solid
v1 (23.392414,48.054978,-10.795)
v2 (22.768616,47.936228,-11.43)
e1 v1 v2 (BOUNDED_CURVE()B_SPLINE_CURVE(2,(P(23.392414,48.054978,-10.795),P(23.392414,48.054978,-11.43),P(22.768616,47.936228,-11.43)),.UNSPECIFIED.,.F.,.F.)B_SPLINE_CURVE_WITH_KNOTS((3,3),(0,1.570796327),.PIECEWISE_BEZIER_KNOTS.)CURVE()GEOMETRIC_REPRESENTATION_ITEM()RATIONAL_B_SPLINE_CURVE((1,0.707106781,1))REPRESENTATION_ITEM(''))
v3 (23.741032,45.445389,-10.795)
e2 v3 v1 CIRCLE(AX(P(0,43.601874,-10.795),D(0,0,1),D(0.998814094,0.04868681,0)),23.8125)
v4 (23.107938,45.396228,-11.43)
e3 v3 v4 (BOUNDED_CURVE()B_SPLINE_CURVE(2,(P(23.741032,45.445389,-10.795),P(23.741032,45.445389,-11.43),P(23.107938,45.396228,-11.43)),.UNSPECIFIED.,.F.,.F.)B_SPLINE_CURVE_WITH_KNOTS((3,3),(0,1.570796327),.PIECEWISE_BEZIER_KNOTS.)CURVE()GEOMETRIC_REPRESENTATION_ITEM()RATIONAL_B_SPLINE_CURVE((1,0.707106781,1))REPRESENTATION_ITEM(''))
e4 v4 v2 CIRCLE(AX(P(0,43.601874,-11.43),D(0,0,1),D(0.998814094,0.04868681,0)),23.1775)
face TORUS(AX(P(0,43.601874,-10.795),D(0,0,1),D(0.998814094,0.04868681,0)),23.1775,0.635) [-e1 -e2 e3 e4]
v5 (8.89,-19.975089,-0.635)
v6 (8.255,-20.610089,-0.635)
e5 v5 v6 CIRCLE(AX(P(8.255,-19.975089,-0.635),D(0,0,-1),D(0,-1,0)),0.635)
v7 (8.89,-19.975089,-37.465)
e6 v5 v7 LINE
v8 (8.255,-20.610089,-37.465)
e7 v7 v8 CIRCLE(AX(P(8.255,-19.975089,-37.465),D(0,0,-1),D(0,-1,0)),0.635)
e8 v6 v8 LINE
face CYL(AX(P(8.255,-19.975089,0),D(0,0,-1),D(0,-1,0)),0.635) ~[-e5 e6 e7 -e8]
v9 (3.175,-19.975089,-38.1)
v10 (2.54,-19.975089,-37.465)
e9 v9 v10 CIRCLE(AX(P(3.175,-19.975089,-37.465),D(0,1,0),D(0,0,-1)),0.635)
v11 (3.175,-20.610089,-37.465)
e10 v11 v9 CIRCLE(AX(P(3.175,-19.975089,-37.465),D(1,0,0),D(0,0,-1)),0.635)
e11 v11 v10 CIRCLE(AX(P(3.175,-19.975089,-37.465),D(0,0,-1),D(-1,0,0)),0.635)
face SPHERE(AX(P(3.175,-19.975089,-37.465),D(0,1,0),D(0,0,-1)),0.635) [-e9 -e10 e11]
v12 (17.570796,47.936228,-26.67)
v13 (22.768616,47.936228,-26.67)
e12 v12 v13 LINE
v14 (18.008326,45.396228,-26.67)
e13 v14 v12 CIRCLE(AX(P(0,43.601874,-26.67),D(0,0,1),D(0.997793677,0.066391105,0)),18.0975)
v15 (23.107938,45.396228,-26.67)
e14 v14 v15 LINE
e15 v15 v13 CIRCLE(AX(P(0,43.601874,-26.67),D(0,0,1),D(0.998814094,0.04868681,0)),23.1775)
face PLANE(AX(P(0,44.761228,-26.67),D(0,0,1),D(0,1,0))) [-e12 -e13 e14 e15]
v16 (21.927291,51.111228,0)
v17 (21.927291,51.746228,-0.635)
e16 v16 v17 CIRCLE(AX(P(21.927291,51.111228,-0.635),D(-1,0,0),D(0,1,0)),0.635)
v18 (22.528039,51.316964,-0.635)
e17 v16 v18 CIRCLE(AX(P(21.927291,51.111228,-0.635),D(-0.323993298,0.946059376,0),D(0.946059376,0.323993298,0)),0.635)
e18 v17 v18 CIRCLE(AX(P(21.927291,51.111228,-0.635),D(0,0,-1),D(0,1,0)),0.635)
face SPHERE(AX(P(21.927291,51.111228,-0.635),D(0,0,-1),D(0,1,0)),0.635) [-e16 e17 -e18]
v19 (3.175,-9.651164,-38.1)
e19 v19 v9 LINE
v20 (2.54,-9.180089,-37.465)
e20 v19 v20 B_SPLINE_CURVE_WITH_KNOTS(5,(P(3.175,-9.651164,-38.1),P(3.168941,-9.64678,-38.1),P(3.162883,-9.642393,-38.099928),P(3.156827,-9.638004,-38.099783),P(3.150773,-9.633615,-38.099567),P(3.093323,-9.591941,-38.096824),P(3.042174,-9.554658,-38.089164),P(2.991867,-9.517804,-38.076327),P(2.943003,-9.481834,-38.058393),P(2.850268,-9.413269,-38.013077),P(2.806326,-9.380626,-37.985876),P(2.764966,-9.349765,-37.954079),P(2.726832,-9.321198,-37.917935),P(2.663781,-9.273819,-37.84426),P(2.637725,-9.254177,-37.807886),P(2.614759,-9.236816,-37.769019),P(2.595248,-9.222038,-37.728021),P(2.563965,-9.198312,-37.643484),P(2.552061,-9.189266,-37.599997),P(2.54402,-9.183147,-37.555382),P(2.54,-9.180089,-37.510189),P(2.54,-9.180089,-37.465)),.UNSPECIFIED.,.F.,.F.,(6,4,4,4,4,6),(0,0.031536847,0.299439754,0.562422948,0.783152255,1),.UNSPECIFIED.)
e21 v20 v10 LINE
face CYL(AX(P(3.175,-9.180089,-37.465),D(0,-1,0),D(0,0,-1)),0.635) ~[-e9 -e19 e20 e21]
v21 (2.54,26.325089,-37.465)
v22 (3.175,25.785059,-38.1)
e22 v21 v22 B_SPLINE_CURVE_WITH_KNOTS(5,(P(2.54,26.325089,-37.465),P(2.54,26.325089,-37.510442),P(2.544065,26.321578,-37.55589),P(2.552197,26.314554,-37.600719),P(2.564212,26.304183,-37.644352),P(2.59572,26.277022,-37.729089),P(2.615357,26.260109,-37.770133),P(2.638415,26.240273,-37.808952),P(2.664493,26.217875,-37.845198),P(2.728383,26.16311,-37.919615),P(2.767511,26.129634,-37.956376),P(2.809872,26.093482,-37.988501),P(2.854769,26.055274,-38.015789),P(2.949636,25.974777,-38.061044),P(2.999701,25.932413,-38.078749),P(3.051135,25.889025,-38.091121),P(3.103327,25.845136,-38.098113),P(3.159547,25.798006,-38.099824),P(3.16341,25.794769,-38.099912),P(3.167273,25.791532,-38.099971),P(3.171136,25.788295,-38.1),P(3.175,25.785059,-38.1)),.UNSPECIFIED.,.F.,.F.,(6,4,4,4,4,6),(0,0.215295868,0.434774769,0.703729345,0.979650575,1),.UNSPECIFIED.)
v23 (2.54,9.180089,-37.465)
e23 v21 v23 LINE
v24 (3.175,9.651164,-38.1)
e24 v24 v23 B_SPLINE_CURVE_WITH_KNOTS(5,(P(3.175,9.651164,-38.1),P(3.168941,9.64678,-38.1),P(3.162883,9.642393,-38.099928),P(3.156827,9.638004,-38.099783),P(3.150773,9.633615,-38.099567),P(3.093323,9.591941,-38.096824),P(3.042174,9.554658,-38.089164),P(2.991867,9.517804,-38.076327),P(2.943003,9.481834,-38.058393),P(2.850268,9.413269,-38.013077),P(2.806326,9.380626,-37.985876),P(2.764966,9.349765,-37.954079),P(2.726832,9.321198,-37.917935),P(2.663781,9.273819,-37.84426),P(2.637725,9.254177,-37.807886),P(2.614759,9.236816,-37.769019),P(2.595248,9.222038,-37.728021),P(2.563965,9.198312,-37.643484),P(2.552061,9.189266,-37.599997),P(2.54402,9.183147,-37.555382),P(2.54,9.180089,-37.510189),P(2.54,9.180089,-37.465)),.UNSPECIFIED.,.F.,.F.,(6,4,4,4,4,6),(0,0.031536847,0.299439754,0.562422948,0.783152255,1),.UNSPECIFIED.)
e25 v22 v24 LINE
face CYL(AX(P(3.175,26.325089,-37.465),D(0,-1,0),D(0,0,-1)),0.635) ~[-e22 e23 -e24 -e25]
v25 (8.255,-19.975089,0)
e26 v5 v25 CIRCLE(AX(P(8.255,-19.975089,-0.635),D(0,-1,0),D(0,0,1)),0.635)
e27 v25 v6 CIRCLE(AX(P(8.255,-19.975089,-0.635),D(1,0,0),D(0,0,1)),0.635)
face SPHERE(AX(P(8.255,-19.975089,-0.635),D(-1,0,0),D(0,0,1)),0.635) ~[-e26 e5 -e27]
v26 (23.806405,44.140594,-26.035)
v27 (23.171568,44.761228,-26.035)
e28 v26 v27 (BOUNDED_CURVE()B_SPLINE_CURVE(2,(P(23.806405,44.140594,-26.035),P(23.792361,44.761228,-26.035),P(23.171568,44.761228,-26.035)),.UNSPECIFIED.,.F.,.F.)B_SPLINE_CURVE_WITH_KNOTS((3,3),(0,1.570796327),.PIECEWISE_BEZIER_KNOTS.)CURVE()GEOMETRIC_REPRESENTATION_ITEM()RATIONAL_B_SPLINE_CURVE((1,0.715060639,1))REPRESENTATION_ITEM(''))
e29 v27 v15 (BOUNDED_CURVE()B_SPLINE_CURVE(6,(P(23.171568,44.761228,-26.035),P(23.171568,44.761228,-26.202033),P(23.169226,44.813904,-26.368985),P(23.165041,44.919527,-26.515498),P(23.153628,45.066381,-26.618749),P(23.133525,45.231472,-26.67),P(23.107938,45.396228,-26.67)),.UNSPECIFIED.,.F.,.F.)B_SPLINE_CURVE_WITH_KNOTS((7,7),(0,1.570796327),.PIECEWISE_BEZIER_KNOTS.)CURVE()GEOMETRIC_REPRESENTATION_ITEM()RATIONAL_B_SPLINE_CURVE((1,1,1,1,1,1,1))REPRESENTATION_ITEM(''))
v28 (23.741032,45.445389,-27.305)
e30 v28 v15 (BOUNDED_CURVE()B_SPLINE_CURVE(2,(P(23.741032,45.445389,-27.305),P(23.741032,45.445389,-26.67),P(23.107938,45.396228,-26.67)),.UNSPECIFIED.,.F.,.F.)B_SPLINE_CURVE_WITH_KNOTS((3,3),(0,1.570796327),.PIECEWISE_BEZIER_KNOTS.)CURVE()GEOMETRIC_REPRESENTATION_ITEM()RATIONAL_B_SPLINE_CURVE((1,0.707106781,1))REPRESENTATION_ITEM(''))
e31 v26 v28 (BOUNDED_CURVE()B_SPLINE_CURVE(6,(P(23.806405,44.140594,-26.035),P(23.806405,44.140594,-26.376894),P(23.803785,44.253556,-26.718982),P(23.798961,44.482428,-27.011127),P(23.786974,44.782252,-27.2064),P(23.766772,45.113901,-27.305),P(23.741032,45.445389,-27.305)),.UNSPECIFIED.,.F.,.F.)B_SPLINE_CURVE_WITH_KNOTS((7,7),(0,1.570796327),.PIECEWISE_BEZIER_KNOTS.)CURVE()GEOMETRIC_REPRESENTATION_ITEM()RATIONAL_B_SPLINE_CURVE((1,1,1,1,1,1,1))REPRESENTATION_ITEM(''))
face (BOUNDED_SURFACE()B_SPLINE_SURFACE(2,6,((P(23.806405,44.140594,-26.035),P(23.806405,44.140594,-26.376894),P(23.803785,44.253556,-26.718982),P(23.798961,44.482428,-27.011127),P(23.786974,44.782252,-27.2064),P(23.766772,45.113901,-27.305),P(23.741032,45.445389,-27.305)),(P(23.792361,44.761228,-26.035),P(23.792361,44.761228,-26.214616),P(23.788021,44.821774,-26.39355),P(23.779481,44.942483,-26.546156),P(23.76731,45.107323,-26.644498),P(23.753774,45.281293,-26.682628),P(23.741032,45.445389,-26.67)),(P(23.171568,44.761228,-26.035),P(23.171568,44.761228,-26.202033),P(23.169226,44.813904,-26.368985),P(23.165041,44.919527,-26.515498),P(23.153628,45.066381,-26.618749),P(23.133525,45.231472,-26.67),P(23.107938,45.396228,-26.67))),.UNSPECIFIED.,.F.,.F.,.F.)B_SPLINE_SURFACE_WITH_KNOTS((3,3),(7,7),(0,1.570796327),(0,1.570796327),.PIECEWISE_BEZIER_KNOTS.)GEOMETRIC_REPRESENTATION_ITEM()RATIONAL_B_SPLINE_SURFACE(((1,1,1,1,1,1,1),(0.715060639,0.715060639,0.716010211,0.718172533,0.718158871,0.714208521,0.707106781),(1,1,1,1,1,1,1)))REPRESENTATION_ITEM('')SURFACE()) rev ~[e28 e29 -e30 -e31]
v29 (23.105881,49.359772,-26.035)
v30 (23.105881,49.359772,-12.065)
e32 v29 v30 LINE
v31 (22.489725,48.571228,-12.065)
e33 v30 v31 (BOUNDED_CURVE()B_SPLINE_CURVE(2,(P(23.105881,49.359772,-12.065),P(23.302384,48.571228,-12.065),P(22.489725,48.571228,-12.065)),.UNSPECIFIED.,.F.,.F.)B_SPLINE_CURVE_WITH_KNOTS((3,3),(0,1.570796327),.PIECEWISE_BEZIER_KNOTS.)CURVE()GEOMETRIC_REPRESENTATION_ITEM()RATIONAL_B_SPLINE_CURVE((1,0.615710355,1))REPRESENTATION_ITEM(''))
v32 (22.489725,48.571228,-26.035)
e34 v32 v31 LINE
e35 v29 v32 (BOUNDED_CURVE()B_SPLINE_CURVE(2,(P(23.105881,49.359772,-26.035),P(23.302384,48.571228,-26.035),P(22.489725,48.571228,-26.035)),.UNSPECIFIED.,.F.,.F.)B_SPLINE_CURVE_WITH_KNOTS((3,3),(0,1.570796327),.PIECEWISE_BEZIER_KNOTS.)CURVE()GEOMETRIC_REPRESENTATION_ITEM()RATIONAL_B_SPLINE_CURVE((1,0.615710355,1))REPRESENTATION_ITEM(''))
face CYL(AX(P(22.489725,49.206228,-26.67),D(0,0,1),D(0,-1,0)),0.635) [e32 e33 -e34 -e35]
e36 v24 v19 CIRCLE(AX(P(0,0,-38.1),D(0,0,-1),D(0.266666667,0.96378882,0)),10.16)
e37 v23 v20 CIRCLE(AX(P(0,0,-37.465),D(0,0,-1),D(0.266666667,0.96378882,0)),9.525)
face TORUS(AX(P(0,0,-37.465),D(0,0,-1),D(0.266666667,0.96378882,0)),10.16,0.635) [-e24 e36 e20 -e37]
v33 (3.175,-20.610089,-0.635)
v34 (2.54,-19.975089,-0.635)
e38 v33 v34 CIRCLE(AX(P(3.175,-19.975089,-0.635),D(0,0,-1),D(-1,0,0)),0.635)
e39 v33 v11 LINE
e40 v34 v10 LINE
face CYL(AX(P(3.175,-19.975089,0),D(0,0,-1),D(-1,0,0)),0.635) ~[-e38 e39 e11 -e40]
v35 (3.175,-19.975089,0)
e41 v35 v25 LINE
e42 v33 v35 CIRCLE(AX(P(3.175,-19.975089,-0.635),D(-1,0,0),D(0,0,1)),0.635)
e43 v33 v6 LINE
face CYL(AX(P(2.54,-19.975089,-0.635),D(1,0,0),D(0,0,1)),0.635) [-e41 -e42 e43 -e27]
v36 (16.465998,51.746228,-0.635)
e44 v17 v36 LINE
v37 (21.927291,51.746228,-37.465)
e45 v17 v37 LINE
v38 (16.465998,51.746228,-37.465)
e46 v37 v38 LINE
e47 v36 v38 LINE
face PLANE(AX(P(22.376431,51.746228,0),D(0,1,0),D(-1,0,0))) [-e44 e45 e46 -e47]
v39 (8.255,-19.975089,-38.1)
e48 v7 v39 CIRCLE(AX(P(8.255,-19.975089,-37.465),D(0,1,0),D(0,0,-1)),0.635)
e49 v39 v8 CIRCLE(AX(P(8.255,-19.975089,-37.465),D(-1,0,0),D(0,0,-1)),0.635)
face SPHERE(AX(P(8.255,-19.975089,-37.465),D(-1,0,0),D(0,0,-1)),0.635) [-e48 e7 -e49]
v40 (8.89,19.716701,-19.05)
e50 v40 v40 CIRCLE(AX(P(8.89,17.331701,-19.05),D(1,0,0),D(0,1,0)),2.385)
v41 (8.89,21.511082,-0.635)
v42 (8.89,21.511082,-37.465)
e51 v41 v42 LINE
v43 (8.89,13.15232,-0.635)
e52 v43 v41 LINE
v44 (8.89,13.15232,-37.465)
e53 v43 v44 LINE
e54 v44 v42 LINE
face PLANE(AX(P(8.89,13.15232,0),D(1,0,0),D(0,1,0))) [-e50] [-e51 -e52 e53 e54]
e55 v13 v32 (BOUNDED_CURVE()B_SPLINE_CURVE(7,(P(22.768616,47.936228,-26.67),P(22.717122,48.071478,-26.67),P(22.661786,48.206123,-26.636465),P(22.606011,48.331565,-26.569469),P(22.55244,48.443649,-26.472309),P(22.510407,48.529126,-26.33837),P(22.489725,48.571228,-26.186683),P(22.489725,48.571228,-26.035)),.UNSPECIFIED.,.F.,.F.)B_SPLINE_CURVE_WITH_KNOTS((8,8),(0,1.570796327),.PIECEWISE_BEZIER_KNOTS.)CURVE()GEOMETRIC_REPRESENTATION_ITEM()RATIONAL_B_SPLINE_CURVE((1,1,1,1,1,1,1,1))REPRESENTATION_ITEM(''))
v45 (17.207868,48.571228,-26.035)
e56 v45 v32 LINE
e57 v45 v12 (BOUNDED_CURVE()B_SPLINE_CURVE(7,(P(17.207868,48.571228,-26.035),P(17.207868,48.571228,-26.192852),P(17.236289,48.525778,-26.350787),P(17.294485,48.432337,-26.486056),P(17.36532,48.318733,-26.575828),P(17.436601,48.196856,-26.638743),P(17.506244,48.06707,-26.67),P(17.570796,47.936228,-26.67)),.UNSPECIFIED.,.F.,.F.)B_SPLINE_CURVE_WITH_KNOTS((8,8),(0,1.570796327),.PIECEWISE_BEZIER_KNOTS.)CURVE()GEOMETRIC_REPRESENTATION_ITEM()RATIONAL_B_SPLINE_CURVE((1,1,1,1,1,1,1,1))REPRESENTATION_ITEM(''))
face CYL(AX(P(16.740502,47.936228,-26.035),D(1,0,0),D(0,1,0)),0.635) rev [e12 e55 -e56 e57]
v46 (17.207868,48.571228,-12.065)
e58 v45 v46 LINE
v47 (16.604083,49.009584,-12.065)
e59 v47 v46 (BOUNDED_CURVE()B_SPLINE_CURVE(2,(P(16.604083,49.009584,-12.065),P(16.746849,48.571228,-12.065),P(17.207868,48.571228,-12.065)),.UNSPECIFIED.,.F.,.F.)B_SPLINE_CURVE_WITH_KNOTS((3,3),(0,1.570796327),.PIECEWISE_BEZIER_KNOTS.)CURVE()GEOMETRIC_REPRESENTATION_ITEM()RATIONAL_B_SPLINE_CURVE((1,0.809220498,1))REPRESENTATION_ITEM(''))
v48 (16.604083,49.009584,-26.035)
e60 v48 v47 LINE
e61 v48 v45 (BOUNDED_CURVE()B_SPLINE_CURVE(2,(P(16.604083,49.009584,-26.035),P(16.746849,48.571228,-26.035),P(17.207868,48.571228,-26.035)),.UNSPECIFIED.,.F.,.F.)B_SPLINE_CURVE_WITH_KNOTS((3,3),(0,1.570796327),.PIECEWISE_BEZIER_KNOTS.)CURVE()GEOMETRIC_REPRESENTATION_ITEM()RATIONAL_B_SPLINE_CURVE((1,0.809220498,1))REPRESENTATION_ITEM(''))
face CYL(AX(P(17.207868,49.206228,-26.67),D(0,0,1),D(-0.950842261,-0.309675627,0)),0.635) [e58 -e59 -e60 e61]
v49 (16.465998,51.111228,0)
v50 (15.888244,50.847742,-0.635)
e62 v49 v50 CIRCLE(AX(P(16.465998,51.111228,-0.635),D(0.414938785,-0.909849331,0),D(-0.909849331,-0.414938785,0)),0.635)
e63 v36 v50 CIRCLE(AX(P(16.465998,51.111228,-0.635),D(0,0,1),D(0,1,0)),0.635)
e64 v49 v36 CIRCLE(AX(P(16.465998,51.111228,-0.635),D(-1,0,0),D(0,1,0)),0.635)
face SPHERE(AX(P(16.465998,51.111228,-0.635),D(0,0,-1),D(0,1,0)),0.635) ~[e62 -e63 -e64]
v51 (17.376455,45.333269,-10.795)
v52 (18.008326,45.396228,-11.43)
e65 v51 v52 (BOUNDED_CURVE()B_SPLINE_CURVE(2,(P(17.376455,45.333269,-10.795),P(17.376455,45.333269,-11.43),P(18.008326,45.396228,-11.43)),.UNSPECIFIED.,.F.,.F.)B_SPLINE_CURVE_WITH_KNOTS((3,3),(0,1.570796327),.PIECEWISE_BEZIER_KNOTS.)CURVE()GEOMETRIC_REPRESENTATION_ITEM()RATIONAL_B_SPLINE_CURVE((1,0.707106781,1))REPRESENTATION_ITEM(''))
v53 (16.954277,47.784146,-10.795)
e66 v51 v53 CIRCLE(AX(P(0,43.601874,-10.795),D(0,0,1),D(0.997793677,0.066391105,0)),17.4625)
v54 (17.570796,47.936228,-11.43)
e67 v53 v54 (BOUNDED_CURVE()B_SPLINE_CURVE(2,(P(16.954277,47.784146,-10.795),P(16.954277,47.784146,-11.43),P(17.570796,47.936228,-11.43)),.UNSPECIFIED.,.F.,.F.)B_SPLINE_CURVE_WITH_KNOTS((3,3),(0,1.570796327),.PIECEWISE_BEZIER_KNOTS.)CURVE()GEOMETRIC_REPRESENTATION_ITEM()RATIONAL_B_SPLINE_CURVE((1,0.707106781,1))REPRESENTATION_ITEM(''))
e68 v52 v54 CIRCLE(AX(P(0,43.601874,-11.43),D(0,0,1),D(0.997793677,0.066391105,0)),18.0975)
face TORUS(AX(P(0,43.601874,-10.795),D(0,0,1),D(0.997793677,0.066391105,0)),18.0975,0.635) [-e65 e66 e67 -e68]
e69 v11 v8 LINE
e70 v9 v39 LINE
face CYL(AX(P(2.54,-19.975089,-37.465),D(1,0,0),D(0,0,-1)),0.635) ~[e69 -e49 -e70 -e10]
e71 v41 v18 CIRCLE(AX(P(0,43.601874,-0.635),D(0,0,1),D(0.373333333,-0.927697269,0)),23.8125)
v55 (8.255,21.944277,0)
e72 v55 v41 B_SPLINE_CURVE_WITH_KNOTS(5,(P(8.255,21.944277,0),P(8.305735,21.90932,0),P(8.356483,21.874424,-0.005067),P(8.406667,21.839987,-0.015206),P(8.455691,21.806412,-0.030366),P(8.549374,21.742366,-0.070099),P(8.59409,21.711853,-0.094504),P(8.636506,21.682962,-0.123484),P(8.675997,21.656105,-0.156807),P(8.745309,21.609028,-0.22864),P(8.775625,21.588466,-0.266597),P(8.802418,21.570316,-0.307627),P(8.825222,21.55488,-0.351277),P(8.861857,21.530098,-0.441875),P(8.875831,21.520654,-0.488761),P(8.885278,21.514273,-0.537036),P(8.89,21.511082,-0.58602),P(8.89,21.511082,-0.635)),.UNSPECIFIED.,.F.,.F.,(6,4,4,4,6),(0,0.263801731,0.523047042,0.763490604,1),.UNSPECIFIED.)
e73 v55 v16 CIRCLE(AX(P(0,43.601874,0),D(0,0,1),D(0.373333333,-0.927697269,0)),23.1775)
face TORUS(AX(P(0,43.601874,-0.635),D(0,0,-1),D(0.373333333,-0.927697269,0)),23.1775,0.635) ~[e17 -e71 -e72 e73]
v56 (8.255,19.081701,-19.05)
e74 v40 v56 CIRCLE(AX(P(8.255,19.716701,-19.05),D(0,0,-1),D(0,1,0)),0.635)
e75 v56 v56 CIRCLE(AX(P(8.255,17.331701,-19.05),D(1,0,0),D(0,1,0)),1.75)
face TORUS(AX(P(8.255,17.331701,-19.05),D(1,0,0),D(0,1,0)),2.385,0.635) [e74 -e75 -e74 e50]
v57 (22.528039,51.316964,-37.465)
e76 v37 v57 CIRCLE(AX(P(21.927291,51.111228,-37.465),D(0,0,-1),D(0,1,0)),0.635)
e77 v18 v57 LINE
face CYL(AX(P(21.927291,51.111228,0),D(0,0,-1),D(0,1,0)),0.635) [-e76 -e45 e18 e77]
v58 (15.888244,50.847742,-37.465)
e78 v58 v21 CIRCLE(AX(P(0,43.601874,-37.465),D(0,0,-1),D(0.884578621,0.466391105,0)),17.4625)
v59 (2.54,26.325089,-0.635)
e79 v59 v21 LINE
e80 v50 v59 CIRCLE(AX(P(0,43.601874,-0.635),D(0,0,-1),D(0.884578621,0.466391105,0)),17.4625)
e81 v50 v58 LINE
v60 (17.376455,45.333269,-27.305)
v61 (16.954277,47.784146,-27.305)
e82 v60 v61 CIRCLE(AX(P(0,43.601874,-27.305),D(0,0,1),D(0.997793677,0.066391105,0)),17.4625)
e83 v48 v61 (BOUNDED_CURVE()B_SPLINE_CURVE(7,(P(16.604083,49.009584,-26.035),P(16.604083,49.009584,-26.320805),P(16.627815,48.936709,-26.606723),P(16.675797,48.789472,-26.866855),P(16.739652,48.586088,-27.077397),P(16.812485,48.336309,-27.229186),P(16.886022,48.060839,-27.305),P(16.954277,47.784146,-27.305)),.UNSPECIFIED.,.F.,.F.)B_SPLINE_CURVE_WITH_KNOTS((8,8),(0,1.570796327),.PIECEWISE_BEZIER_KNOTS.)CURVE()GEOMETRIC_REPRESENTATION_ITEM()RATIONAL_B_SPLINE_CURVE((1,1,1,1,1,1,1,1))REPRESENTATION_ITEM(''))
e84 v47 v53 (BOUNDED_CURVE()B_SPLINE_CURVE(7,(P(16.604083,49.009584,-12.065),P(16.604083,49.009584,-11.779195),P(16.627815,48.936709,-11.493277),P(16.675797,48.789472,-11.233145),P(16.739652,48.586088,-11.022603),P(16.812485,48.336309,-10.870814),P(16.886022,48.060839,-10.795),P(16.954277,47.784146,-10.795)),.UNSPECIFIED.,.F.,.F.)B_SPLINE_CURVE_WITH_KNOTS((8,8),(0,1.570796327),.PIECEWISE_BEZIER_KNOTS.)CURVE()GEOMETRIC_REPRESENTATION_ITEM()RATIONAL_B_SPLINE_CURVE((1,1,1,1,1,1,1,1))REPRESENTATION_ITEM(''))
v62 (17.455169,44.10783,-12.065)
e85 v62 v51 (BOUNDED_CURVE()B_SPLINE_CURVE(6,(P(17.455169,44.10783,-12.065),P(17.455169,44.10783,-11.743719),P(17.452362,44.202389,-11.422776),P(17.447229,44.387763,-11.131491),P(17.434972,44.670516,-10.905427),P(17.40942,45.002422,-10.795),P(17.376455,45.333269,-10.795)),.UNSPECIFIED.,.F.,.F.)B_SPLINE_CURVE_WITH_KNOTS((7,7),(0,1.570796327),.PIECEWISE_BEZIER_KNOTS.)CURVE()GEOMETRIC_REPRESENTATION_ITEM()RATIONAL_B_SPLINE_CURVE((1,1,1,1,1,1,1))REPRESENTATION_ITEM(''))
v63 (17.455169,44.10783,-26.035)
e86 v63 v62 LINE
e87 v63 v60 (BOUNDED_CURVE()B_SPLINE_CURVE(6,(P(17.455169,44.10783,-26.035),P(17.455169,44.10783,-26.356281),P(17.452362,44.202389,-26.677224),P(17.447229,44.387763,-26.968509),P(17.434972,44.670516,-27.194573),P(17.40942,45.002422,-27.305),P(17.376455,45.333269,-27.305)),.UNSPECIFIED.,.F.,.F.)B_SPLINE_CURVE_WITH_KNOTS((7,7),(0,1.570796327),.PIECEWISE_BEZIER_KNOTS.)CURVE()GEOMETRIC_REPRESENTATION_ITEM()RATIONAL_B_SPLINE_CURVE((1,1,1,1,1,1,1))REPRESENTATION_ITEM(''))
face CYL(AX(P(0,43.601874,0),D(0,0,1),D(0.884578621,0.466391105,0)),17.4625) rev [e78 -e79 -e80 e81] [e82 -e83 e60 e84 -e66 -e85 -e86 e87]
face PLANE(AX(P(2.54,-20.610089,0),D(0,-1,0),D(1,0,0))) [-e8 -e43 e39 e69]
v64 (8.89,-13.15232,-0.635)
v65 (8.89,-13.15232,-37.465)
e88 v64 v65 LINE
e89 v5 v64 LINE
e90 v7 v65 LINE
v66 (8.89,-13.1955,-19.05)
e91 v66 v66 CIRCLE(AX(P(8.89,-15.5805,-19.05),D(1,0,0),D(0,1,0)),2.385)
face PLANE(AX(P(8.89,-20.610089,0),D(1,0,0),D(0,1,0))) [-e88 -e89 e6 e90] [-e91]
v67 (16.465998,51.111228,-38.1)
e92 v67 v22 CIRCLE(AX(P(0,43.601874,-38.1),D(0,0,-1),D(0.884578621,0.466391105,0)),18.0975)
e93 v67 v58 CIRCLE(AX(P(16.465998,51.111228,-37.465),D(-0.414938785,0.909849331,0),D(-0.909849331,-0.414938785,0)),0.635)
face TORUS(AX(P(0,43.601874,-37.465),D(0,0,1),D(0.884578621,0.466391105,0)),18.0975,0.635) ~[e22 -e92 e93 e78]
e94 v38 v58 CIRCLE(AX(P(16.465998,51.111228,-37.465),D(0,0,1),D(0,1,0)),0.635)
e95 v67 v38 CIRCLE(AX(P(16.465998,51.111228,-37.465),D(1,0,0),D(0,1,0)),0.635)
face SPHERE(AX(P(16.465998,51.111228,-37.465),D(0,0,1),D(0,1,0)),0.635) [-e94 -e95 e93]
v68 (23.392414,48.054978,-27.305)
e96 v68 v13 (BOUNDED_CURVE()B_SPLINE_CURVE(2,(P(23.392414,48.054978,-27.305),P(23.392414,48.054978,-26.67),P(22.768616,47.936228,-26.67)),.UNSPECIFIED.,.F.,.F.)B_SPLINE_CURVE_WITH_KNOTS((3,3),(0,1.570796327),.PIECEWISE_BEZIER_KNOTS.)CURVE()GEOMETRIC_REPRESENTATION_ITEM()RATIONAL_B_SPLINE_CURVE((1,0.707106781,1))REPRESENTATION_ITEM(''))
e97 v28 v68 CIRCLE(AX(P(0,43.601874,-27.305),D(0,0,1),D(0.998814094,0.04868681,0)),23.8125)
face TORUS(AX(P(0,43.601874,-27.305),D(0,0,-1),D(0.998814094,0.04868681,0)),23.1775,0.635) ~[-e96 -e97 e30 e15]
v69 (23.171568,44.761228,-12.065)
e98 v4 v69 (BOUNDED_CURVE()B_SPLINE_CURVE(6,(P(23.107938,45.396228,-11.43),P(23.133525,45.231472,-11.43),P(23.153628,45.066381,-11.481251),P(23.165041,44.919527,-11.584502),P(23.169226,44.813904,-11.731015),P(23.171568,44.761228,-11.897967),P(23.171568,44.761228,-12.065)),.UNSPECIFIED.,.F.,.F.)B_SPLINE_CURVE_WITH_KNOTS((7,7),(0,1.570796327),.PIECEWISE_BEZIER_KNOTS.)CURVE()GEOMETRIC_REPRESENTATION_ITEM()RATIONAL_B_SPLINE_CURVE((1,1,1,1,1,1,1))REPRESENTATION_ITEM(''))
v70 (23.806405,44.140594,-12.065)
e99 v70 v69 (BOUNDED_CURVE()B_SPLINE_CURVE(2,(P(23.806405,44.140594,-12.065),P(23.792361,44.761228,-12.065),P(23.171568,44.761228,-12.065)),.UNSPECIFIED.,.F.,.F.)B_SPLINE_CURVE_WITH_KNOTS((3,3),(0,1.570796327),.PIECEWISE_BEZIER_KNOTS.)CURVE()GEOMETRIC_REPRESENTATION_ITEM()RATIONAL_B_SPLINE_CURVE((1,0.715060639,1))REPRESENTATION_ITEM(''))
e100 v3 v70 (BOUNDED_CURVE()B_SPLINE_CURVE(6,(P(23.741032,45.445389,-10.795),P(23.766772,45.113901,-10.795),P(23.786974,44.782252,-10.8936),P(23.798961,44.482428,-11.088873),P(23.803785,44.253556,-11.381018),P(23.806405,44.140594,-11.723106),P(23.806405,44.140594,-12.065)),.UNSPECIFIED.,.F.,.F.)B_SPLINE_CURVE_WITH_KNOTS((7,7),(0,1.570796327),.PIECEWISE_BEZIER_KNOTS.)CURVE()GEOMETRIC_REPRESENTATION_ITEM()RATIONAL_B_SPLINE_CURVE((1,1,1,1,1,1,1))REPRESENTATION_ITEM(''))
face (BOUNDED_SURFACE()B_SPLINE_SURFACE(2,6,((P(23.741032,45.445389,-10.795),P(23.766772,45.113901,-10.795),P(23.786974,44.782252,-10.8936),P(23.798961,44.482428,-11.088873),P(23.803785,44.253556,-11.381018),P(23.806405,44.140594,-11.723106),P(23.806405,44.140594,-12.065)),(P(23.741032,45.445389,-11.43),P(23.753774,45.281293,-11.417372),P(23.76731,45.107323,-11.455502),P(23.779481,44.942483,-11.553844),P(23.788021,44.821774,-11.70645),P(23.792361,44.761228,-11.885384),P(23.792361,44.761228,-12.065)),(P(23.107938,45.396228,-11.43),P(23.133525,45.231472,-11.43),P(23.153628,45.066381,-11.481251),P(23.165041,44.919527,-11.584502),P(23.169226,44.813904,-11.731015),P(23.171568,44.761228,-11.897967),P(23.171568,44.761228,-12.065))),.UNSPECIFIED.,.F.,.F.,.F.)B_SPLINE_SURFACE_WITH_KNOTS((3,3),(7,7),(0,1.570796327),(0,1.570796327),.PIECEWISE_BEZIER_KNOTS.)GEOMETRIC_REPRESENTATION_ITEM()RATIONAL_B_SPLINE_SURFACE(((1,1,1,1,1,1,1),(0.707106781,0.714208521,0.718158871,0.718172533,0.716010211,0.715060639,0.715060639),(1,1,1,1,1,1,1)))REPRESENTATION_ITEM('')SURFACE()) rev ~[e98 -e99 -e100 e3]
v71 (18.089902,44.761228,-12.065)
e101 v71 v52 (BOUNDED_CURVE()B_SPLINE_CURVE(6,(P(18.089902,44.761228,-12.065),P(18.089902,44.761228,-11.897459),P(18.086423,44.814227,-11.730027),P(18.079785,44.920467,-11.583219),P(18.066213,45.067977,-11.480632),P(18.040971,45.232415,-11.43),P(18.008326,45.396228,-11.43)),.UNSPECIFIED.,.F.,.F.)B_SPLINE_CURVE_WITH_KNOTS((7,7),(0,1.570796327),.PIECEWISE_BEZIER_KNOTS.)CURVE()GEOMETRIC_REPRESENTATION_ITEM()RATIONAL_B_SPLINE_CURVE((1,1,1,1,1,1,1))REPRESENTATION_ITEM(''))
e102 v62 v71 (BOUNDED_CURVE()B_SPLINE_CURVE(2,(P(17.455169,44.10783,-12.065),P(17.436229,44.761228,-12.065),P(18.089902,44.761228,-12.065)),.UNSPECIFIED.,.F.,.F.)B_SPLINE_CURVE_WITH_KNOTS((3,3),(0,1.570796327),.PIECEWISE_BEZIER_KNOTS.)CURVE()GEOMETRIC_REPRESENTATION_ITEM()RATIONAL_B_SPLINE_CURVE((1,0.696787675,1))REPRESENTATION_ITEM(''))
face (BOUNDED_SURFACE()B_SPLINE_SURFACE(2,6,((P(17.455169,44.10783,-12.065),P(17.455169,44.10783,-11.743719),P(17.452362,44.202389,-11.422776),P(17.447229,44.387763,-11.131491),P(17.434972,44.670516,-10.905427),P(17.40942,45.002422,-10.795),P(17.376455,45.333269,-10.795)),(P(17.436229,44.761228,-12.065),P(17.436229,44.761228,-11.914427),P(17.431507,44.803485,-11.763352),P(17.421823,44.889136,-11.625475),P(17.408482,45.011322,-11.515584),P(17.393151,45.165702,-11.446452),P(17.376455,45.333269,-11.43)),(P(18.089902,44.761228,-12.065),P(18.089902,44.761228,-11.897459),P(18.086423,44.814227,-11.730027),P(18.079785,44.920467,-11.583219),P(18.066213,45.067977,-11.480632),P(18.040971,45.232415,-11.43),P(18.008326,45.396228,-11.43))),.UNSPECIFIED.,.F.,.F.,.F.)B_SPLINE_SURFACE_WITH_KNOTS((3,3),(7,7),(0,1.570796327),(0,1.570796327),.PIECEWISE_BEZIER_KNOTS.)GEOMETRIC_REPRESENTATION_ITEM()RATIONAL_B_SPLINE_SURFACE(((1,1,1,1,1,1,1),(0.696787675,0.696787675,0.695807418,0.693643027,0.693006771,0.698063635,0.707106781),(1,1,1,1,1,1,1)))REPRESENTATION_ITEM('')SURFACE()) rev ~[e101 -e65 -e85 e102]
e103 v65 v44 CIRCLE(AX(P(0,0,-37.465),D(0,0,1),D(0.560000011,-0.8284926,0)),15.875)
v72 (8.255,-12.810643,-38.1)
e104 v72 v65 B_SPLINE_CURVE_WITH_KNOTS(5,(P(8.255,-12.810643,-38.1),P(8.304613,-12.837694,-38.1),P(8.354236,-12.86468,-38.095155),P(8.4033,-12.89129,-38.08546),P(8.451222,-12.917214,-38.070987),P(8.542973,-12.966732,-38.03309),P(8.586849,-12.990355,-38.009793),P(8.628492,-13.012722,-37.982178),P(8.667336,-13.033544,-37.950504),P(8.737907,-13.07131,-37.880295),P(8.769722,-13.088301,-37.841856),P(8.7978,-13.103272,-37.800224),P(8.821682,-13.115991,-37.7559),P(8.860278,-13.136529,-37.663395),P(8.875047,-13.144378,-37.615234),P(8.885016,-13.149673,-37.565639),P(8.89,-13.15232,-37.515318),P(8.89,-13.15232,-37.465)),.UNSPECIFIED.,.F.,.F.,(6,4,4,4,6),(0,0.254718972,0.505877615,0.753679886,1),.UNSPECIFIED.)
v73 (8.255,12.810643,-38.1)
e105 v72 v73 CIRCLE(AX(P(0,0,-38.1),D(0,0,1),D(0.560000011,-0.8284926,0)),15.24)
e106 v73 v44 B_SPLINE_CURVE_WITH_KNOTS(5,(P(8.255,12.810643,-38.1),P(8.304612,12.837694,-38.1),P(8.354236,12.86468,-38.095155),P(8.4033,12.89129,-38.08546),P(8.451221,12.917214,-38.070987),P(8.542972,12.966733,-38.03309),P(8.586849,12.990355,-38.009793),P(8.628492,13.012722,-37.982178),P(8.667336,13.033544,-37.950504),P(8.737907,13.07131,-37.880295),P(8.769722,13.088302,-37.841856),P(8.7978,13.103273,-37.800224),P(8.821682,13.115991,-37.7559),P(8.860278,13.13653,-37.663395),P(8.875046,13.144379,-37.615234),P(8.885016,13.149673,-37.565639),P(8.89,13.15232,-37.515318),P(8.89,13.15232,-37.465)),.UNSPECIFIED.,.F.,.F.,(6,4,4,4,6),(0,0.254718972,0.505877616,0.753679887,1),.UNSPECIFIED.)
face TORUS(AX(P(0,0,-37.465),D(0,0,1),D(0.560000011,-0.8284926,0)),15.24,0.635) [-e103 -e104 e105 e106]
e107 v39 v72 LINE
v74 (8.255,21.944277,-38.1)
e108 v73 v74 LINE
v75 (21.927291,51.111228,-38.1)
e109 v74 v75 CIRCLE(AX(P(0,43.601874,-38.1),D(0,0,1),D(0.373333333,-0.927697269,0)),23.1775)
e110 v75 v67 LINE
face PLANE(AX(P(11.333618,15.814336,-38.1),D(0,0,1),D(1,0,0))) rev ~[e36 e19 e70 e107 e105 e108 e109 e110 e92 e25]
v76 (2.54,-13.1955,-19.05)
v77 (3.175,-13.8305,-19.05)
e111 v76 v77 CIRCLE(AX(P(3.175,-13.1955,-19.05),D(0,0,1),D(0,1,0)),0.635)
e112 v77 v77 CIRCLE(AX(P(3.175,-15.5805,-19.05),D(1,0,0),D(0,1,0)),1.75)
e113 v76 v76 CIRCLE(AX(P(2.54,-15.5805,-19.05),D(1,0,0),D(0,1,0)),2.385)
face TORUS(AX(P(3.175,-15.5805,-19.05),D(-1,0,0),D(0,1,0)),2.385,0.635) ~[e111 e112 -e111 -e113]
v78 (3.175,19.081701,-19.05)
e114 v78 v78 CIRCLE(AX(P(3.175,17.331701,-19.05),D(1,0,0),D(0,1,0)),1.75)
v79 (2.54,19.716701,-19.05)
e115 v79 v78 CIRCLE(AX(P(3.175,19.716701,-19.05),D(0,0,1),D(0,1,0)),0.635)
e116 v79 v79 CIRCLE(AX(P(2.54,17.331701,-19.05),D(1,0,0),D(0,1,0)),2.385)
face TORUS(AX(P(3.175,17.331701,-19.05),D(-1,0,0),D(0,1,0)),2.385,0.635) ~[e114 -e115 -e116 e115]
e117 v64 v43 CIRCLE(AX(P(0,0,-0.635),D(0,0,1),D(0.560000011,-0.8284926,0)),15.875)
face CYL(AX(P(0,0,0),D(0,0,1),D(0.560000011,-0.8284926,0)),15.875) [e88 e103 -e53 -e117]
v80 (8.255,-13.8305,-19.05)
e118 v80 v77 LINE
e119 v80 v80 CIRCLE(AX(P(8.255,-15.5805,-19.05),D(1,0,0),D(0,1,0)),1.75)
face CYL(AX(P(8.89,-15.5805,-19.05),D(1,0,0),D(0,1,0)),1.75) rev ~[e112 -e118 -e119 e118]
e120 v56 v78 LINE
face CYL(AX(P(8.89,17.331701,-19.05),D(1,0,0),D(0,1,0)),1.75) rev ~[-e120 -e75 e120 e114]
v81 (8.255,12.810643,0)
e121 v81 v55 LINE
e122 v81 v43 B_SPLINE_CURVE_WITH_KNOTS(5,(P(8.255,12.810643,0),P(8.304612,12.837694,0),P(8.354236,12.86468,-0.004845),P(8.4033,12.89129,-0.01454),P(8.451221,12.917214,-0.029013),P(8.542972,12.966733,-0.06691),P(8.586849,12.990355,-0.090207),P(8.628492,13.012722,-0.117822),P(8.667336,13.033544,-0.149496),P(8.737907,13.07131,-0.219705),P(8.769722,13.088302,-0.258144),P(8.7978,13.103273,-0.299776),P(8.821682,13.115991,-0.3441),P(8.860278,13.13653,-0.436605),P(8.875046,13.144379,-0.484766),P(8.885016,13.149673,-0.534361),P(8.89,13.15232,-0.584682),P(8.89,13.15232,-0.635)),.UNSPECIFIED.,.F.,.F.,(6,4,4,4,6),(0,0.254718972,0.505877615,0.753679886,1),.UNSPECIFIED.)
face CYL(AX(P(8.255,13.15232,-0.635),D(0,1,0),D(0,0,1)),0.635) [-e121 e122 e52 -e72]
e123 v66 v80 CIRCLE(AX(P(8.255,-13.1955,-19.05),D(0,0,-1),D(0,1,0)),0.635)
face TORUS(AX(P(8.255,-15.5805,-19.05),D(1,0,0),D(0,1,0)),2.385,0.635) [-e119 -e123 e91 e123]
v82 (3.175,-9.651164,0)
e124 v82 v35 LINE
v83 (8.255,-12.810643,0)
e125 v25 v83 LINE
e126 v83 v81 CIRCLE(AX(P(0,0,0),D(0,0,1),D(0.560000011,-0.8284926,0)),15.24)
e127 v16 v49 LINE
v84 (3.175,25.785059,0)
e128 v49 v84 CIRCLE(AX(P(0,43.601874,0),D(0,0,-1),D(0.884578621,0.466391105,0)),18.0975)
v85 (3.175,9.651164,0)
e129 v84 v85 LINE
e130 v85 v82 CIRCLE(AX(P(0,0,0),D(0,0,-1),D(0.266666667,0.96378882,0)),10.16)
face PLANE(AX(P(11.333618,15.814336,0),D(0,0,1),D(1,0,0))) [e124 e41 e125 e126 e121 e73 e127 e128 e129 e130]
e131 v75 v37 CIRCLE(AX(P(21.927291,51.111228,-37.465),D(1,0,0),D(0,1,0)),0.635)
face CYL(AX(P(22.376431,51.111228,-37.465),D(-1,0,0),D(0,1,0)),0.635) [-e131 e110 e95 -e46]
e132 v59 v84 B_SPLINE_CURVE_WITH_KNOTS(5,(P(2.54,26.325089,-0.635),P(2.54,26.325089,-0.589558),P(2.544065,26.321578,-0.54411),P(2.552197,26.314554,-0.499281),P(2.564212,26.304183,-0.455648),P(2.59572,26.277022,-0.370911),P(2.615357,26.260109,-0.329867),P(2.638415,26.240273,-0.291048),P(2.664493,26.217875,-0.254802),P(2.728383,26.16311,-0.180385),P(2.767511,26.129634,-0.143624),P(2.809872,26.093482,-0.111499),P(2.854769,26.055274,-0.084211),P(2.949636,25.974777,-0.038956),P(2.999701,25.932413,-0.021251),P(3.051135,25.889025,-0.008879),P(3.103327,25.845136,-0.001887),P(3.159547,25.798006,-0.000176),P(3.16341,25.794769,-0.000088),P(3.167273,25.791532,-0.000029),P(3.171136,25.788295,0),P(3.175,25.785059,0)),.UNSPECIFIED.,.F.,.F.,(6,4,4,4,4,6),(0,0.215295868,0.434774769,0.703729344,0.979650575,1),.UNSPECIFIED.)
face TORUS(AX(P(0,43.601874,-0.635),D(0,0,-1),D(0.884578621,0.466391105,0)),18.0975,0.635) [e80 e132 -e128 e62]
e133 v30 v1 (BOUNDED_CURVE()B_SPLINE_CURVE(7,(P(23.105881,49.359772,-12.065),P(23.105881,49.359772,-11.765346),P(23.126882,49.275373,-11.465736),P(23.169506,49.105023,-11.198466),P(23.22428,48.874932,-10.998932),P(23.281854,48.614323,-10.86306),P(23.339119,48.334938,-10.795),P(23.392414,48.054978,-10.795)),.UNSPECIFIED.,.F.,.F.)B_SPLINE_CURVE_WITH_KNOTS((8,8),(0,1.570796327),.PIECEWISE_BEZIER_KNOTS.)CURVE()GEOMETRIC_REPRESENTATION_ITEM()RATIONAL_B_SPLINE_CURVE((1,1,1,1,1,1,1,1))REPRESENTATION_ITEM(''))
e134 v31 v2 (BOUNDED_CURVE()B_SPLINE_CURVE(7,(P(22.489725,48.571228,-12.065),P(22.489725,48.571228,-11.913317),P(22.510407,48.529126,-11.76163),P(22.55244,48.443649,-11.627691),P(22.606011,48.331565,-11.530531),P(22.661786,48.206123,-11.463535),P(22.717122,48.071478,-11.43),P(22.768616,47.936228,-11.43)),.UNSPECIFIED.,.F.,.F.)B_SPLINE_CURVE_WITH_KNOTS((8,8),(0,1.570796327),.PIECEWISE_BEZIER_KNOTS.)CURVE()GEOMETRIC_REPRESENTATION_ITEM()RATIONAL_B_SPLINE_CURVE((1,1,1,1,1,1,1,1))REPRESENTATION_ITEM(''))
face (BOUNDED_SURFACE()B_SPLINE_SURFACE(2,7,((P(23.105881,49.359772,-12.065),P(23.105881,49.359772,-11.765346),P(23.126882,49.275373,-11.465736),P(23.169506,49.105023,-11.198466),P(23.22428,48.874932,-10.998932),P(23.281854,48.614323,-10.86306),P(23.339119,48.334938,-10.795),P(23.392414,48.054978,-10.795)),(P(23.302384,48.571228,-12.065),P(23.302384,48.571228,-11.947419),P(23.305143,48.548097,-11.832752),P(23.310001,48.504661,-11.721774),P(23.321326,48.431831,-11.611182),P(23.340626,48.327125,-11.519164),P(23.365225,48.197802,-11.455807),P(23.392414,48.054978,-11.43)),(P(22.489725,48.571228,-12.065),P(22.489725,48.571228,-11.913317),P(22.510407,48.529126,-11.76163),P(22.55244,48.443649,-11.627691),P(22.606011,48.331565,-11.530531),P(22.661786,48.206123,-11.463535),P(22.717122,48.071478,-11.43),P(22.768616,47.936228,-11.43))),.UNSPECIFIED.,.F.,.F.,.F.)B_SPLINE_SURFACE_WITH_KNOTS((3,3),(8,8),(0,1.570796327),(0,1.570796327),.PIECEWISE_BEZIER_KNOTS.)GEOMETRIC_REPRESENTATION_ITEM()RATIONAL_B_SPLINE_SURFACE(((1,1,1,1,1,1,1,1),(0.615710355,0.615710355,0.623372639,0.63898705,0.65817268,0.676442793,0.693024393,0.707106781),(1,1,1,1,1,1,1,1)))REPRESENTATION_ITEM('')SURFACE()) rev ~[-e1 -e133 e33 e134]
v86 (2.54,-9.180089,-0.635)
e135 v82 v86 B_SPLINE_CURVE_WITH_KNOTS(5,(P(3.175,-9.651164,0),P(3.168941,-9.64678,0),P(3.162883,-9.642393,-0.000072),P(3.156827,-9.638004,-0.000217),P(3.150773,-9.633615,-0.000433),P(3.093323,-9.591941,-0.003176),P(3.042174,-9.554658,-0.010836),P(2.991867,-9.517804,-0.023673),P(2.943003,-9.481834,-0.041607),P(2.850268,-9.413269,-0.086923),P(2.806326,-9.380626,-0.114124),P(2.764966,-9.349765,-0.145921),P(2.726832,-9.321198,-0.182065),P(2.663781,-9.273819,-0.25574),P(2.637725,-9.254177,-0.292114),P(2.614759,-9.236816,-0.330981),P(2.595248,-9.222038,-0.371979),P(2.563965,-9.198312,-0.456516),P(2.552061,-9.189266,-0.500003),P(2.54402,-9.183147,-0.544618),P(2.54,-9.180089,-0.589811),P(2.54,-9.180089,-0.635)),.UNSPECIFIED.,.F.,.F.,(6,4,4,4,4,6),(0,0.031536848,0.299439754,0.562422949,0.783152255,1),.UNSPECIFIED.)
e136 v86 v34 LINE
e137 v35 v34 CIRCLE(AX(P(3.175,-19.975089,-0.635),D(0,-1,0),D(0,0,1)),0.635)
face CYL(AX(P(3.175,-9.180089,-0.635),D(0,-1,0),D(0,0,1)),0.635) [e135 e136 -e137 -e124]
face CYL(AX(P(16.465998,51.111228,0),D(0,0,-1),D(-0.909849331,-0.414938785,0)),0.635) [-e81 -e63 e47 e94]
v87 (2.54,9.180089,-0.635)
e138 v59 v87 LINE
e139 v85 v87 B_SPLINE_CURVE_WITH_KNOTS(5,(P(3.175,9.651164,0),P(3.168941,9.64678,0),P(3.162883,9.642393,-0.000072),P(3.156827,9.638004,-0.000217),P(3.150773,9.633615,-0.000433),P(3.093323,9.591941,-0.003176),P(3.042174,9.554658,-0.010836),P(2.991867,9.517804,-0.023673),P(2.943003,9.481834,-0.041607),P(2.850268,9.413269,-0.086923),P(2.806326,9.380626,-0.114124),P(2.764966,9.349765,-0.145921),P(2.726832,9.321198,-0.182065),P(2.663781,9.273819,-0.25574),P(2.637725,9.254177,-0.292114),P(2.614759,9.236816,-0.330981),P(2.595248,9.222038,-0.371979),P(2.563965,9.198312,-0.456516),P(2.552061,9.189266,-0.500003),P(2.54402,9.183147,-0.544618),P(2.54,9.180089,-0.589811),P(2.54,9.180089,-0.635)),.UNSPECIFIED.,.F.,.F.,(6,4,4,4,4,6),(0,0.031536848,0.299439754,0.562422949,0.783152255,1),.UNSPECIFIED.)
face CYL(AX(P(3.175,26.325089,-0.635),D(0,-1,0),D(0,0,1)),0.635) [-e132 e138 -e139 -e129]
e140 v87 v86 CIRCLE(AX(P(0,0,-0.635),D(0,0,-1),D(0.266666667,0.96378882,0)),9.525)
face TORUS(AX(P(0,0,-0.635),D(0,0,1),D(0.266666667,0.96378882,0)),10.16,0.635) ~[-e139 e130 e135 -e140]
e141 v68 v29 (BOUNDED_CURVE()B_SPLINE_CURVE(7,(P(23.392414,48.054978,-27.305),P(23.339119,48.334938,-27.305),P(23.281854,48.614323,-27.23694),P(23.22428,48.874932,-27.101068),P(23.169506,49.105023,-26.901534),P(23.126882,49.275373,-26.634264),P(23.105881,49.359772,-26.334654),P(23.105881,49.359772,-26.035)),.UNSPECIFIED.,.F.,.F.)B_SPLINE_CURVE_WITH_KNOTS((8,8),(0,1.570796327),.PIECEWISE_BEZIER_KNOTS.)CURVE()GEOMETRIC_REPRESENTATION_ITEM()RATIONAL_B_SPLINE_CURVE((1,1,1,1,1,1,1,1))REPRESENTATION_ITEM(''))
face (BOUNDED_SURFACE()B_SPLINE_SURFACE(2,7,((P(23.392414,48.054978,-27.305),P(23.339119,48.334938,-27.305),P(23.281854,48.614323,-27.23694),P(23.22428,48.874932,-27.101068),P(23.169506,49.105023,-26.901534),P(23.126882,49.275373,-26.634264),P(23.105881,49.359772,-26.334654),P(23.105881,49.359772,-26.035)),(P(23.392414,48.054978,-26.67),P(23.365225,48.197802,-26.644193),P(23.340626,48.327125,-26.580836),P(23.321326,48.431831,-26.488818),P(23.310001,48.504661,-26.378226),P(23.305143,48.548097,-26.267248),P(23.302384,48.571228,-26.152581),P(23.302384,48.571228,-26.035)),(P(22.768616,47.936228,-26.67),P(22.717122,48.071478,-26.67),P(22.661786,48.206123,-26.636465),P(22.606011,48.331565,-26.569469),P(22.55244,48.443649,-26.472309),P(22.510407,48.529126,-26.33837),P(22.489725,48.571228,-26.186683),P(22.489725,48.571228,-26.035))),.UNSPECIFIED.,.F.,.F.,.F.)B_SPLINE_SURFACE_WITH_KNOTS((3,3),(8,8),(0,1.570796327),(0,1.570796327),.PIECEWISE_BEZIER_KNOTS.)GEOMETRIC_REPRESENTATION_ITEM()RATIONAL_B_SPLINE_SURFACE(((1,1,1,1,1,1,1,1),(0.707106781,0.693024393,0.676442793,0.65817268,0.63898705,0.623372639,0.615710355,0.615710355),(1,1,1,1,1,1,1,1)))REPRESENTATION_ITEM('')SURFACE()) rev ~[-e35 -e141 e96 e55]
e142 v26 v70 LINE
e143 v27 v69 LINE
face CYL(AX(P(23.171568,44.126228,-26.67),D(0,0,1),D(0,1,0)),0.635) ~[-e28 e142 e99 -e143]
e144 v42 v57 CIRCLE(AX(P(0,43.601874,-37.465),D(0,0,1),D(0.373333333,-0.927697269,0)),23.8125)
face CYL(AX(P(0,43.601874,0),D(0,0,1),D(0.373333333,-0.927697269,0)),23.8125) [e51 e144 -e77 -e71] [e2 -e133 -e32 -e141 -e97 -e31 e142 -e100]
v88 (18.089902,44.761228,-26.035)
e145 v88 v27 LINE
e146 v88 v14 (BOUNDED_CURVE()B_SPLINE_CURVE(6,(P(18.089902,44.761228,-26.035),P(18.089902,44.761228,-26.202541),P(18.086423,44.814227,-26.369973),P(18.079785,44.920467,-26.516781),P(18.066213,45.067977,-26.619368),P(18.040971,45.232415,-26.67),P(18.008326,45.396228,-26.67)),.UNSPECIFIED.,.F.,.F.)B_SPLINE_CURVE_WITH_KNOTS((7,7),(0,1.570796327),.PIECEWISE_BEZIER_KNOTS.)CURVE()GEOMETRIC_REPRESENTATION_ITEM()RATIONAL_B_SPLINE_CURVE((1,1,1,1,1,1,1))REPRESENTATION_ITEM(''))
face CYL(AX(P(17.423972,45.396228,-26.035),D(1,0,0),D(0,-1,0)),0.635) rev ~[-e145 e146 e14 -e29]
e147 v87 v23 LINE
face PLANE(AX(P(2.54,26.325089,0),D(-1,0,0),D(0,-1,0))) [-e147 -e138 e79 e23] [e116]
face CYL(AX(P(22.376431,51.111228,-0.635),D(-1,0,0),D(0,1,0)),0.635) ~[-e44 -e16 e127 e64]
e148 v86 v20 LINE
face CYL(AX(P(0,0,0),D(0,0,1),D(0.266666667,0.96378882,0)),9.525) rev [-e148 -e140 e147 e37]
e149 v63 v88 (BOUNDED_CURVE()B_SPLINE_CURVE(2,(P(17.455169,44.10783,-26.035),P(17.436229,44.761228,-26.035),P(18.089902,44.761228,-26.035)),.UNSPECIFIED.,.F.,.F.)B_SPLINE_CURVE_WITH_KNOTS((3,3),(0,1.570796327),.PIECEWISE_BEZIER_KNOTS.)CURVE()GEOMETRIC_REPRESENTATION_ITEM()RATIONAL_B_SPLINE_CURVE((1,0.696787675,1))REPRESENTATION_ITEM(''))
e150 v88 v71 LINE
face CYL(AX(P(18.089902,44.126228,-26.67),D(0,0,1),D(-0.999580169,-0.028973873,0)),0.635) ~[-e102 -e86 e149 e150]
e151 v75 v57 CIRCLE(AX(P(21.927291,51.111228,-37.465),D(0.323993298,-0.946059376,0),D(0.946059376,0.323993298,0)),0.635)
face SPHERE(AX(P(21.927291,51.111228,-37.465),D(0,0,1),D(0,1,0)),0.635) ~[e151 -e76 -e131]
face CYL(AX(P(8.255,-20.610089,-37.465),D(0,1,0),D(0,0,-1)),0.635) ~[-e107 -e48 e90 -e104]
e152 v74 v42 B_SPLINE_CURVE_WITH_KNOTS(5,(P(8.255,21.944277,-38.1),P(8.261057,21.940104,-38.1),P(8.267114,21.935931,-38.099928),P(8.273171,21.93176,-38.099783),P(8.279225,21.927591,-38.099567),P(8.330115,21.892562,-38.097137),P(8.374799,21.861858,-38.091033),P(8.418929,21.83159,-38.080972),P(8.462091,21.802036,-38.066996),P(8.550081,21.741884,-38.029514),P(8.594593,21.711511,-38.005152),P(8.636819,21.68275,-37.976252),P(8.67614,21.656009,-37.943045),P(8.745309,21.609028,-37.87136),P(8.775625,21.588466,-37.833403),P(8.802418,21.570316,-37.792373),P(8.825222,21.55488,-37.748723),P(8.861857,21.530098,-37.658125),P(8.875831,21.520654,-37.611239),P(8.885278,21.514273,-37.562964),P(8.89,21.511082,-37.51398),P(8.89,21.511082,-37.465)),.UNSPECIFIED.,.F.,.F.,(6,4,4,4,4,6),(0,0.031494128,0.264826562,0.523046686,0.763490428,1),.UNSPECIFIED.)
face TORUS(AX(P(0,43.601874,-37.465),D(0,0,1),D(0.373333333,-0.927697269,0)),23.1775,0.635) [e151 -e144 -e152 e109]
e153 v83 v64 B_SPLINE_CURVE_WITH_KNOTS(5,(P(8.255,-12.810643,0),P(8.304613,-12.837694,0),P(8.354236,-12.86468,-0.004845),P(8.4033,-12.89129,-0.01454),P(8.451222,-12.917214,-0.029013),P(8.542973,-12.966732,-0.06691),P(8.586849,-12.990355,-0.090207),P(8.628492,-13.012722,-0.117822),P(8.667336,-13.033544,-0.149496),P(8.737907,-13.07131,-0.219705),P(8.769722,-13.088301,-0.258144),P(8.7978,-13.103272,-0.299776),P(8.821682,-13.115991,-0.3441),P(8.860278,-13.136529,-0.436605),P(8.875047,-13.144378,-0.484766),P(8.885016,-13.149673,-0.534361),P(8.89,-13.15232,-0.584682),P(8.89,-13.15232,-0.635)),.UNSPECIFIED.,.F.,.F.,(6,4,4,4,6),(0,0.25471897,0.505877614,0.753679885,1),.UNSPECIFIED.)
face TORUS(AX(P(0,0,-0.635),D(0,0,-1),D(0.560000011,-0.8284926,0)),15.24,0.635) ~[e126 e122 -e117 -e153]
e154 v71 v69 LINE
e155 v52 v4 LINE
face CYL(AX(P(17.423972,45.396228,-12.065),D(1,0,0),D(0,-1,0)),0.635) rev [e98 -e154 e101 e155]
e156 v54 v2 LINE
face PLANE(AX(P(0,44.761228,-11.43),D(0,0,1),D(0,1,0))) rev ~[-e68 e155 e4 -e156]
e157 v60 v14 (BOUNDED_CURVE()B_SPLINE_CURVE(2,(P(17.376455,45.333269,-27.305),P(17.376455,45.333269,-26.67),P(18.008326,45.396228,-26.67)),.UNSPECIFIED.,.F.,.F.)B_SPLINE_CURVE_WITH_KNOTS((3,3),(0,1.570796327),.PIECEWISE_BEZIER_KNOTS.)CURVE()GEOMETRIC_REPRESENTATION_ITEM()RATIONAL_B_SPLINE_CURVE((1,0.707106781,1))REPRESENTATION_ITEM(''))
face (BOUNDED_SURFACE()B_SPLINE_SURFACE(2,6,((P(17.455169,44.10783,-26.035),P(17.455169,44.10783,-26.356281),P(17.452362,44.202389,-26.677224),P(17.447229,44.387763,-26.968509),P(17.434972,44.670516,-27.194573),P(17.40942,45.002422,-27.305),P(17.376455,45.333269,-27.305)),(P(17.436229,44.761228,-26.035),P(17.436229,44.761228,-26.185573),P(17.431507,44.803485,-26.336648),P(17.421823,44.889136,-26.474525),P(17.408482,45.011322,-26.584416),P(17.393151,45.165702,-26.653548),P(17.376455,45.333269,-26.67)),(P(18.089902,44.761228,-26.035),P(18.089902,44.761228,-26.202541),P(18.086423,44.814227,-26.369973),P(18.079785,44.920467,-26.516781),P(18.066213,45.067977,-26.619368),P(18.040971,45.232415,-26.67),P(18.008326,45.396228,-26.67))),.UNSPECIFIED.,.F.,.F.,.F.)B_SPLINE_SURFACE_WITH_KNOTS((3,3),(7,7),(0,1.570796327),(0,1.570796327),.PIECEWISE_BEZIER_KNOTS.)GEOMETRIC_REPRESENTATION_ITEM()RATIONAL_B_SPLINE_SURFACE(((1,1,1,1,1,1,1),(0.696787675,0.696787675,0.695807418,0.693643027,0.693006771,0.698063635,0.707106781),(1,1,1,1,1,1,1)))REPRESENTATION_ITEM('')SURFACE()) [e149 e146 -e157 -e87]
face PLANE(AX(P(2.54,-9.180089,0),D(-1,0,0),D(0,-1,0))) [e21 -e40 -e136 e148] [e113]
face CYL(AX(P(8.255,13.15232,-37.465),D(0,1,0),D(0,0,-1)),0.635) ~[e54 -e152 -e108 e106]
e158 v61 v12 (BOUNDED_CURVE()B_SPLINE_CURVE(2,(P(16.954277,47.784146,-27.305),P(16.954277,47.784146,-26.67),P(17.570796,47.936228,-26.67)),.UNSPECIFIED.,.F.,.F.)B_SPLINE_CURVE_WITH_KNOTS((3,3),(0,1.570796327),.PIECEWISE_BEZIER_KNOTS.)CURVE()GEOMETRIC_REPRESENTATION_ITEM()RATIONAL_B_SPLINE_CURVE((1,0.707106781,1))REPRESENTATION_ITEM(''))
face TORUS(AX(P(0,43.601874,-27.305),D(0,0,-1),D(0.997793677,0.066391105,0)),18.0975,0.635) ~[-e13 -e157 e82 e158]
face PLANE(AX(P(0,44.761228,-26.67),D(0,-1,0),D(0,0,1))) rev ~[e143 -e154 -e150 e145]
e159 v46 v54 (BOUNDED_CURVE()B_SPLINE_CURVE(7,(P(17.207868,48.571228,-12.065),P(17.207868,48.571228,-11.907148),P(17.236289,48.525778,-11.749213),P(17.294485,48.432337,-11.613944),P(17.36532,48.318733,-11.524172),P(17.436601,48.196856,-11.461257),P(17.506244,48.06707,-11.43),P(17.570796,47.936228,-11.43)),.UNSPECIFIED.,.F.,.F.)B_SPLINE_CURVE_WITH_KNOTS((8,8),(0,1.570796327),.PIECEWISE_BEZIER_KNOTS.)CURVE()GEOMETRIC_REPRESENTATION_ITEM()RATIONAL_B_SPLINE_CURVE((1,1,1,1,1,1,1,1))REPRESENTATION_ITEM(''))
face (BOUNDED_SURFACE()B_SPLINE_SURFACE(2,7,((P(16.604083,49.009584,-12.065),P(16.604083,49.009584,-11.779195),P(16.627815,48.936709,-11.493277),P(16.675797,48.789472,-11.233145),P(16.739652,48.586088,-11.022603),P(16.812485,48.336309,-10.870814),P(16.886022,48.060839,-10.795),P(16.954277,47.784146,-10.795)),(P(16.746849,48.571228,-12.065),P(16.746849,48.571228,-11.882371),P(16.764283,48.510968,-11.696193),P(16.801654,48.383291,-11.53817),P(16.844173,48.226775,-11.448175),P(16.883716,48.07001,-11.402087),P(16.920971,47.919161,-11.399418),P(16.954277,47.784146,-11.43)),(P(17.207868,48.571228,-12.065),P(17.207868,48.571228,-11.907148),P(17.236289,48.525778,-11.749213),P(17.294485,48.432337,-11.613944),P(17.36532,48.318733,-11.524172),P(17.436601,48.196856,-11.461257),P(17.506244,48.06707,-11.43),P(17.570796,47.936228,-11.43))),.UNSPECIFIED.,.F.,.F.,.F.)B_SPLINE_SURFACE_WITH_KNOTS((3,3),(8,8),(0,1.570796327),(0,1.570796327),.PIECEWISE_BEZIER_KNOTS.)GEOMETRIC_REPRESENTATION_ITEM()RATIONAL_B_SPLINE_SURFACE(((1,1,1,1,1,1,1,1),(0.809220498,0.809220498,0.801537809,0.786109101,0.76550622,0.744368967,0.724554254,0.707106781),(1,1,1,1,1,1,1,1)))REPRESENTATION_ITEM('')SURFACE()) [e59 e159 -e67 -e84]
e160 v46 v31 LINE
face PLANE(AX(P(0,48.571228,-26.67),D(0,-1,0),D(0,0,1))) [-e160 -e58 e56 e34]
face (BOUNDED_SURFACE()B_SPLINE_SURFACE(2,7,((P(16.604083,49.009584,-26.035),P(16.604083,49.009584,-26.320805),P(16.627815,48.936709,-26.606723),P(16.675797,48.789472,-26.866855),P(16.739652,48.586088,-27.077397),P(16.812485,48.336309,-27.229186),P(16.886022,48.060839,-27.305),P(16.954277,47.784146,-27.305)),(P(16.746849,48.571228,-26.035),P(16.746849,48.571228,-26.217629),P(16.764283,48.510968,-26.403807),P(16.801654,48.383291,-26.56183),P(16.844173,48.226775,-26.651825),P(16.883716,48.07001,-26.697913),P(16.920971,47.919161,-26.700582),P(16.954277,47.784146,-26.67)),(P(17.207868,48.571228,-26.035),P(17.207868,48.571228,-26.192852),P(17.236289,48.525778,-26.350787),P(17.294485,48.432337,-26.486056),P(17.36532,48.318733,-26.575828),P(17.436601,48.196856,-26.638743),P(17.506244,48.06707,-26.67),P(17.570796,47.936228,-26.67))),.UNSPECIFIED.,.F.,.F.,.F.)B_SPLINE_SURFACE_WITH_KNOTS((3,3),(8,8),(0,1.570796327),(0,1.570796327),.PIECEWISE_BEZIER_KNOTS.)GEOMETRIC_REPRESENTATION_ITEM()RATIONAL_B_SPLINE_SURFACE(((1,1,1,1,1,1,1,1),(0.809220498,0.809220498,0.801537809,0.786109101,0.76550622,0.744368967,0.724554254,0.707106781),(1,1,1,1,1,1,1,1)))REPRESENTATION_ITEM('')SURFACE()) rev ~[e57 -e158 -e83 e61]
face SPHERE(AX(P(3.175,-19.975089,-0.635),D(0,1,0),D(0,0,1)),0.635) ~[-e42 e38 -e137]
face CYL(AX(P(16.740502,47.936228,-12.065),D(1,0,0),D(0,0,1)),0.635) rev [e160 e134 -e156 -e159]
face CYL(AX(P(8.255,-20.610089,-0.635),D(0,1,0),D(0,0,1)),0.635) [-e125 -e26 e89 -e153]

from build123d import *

# Parameters (mm, degrees)
F1_DEPTH = 38.1
F2_R     = 1.75
F3_DEPTH = 6.35
F4_W     = 3.81
F4_H     = 15.24
F5_DEPTH = 23.8135
F6_R     = 1.75
F7_DEPTH = 6.351000172
F8_R     = 0.635


with BuildPart() as f1:
    # F0 (on Top) → F1 (new body)
    with BuildSketch(Plane.XY):
        with BuildLine():
            ThreePointArc((15.4469541779, 51.7462283529), (15.5705240089, 35.6963257432), (2.54, 26.3250885072))
            Line((2.54, 26.3250885072), (2.54, 9.1800885072))
            ThreePointArc((2.54, 9.1800885072), (9.525, 0), (2.54, -9.1800885072))
            Line((2.54, -9.1800885072), (2.54, -20.6100885072))
            Line((2.54, -20.6100885072), (8.890000172, -20.6100885072))
            Line((8.890000172, -20.6100885072), (8.890000172, -13.1523200213))
            ThreePointArc((8.890000172, -13.1523200213), (15.875, 1.038e-07), (8.89, 13.1523201375))
            Line((8.89, 13.1523201375), (8.89, 21.5110824807))
            ThreePointArc((8.89, 21.5110824807), (21.7471476529, 33.9015270357), (22.3764305325, 51.7462283529))
            Line((22.3764305325, 51.7462283529), (15.4469541779, 51.7462283529))
        make_face()
    extrude(amount=-F1_DEPTH)

    # F2 (on face) → F3 (cut, through all)
    with BuildSketch(Plane.YZ.offset(8.89)):
        with Locations((17.3317013091, -19.05)):
            Circle(F2_R)
    extrude(amount=-F3_DEPTH, mode=Mode.SUBTRACT)

    # F4 (on Right) → F5 (cut, through all)
    with BuildSketch(Plane.YZ):
        with Locations((46.6662283529, -19.05)):
            Rectangle(F4_W, F4_H)
    extrude(amount=F5_DEPTH, mode=Mode.SUBTRACT)

    # F6 (on face) → F7 (cut, through all)
    with BuildSketch(Plane.YZ.offset(8.890000172)):
        with Locations((-15.5805000213, -19.05)):
            Circle(F6_R)
    extrude(amount=-F7_DEPTH, mode=Mode.SUBTRACT)

    # F8
    f8_edges = [f1.edges().sort_by_distance(p)[0] for p in [
        (18.911692, 51.746228, 0),
        (15.570524, 35.696326, 0),
        (2.54, 17.752589, 0),
        (9.525, 0, 0),
        (2.54, -14.895089, 0),
        (5.715, -20.610089, 0),
        (8.89, -16.881204, 0),
        (15.875, 0, 0),
        (8.89, 17.331701, 0),
        (21.747148, 33.901527, 0),
        (18.911692, 51.746228, -38.1),
        (15.570524, 35.696326, -38.1),
        (2.54, 17.752589, -38.1),
        (9.525, 0, -38.1),
        (2.54, -14.895089, -38.1),
        (5.715, -20.610089, -38.1),
        (8.89, -16.881204, -38.1),
        (15.875, 0, -38.1),
        (8.89, 17.331701, -38.1),
        (21.747148, 33.901527, -38.1),
        (2.54, -20.610089, -19.05),
        (8.89, -20.610089, -19.05),
        (22.376431, 51.746228, -19.05),
        (15.446954, 51.746228, -19.05),
        (5.715, 19.081701, -19.05),
        (8.89, 15.581701, -19.05),
        (2.54, 15.581701, -19.05),
        (8.89, -17.3305, -19.05),
        (5.715, -13.8305, -19.05),
        (2.54, -17.3305, -19.05),
        (17.188131, 46.685224, -11.43),
        (20.604116, 44.761228, -11.43),
        (23.613203, 46.676249, -11.43),
        (20.014356, 48.571228, -11.43),
        (17.188131, 46.685224, -26.67),
        (20.014356, 48.571228, -26.67),
        (23.613203, 46.676249, -26.67),
        (20.604116, 44.761228, -26.67),
        (23.288209, 48.571228, -19.05),
        (23.784261, 44.761228, -19.05),
        (17.423972, 44.761228, -19.05),
        (16.740502, 48.571228, -19.05),
    ]]
    fillet(f8_edges, radius=F8_R)


solid = f1.part
